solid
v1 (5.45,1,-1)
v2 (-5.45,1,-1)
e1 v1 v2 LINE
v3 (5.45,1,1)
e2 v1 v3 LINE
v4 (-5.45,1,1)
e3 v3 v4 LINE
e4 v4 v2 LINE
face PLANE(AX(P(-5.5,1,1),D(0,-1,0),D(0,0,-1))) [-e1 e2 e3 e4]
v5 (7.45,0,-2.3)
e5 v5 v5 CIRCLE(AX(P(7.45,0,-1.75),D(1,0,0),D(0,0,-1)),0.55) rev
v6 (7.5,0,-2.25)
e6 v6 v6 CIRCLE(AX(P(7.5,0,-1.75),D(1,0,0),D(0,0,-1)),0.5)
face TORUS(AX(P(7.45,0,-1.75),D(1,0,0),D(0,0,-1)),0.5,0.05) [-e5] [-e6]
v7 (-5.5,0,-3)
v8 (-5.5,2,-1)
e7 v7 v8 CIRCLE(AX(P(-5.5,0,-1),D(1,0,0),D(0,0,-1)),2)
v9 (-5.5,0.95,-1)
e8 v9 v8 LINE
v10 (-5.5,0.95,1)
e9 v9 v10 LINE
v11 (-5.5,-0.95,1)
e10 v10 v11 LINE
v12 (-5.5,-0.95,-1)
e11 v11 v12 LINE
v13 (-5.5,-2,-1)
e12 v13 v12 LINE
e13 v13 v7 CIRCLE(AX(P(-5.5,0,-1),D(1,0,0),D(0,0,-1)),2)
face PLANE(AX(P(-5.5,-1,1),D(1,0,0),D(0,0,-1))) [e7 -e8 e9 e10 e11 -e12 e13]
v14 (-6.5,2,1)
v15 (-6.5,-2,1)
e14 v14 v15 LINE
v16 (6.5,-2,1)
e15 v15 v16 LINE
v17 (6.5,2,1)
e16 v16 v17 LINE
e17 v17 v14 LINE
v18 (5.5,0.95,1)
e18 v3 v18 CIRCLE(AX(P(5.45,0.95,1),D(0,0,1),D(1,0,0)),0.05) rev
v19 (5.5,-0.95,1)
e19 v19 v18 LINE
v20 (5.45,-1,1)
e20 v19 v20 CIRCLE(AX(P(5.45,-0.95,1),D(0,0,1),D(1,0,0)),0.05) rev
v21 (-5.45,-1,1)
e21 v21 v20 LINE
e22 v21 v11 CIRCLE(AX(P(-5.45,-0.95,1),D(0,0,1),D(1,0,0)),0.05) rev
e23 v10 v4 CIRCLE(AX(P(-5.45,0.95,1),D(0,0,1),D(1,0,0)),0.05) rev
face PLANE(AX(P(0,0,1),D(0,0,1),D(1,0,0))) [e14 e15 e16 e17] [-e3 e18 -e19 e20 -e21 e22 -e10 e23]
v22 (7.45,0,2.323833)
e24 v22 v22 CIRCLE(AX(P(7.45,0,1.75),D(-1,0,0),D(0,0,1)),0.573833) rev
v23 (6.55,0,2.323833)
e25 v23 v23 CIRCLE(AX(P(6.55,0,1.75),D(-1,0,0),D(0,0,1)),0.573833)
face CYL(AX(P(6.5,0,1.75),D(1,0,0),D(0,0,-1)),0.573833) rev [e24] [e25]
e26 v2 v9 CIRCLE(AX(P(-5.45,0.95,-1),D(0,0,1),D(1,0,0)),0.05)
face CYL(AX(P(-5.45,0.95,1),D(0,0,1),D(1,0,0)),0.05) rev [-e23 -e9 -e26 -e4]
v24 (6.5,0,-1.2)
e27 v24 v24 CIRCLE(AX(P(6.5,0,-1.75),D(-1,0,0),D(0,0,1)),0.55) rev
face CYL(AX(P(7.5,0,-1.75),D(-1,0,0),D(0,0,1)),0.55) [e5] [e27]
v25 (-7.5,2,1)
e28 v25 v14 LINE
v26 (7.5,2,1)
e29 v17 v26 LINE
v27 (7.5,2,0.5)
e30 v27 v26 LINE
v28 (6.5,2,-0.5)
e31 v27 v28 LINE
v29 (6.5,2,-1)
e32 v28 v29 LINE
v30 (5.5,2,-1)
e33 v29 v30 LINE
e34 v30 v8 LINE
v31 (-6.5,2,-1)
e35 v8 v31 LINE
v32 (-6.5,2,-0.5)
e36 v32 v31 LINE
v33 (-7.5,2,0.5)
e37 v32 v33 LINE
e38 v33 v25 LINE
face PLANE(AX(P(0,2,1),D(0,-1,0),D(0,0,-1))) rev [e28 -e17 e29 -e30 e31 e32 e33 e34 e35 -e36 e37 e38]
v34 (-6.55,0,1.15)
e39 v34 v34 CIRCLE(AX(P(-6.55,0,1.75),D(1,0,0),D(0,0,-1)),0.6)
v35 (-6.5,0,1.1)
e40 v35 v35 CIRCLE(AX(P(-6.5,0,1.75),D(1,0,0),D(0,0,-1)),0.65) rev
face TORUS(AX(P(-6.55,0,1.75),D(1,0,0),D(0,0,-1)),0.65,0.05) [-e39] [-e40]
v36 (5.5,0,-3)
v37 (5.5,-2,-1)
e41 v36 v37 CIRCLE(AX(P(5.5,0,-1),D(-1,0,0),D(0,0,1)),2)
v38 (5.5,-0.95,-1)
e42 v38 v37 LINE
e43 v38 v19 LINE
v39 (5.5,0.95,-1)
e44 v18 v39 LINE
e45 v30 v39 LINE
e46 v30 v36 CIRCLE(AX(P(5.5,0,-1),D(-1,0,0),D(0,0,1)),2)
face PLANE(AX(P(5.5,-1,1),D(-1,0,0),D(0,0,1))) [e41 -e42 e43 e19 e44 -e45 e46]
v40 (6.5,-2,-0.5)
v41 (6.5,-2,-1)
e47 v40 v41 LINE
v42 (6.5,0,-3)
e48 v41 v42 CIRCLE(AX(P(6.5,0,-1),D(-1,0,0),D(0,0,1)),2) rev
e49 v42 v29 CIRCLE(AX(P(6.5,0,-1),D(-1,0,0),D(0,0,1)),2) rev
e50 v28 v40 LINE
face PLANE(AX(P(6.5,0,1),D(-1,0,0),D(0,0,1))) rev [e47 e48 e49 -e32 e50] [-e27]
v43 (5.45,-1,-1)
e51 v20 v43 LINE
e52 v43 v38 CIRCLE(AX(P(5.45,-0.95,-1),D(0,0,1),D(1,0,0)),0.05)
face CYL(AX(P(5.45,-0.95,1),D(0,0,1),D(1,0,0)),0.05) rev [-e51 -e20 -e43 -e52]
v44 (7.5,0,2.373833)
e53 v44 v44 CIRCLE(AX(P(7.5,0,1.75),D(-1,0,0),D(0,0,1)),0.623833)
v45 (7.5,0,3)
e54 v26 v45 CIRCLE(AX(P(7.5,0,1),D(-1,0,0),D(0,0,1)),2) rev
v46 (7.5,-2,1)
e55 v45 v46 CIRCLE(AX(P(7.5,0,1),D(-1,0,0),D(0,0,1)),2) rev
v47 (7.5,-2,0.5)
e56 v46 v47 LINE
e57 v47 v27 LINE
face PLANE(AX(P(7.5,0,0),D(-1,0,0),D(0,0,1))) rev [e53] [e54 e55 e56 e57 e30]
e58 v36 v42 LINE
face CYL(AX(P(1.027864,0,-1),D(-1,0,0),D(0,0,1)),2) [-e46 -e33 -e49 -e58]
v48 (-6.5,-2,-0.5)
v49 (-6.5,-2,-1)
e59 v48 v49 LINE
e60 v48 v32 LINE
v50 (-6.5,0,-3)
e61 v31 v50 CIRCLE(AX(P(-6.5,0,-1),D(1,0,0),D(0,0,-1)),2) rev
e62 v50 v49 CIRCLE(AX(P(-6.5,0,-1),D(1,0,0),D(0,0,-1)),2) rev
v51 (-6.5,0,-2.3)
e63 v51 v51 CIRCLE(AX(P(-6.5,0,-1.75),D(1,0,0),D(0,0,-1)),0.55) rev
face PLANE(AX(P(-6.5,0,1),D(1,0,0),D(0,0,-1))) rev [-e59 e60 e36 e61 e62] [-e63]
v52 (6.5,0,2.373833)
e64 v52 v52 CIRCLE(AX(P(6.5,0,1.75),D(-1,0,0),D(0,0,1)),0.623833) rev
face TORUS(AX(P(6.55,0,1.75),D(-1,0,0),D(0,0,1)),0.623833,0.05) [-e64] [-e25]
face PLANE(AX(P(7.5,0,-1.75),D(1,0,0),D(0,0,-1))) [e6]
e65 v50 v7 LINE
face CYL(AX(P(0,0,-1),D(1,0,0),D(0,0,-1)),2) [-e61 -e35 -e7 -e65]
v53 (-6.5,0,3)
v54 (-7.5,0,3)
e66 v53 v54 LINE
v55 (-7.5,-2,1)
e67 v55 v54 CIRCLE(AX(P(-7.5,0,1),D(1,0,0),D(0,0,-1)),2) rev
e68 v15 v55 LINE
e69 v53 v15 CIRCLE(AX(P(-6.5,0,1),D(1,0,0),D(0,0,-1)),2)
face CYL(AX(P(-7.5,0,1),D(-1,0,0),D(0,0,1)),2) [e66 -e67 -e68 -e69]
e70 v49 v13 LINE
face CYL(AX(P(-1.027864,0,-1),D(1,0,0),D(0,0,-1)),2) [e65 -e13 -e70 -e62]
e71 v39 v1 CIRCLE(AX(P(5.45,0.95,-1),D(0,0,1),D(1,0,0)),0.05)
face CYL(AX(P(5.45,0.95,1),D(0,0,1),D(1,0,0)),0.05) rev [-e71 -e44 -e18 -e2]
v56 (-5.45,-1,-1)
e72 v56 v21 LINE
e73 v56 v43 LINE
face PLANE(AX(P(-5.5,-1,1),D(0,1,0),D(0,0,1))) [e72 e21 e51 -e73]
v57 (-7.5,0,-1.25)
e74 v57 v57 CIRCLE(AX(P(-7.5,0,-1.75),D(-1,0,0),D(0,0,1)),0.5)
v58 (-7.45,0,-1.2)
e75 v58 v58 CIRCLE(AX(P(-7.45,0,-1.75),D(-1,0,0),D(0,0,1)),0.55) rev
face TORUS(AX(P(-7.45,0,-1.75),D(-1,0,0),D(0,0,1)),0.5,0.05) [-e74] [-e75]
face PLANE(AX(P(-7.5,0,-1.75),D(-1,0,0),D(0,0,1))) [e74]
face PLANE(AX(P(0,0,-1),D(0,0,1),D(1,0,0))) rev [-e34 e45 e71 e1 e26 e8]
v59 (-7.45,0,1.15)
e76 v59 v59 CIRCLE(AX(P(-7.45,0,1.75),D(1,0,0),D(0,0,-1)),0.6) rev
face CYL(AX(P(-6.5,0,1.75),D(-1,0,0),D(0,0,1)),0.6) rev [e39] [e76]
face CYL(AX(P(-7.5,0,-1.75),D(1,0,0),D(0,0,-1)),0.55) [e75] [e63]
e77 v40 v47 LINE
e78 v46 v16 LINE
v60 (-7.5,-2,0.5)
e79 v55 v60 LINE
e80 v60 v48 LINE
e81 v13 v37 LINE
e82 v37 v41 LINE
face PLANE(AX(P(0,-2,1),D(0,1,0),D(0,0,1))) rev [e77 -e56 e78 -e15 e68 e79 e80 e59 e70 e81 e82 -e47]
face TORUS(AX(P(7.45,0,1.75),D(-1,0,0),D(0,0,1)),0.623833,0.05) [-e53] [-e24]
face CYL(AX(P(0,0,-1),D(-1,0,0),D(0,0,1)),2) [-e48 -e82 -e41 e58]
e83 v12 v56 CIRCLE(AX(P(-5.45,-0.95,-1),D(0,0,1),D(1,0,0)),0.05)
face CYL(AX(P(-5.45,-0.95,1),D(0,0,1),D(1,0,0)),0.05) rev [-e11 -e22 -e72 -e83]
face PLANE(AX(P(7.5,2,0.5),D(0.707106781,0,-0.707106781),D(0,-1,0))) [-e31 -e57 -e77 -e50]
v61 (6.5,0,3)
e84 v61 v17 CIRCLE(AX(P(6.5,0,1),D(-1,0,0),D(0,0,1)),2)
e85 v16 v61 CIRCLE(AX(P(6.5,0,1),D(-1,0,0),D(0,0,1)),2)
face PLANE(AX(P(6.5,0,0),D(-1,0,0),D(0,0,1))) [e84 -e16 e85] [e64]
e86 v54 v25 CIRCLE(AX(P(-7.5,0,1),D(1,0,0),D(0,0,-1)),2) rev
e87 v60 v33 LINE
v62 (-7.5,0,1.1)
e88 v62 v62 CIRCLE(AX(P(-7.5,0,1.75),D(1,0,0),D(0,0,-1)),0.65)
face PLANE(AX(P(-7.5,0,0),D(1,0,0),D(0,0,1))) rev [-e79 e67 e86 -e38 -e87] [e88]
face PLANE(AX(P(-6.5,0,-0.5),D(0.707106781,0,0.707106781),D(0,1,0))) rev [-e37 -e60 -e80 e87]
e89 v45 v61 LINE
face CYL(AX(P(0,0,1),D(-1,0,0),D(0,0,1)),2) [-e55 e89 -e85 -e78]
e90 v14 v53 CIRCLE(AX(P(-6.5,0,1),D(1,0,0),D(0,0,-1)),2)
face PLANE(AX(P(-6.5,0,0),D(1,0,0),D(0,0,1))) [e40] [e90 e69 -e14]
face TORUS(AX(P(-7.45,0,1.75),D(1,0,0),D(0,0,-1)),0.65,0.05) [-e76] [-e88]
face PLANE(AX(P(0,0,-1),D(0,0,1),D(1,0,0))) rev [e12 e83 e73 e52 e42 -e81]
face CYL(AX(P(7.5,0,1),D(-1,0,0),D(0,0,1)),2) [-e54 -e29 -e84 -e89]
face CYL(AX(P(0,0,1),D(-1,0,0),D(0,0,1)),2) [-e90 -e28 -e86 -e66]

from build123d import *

# Parameters (mm, degrees)
SKETCH1_W           = 13
SKETCH1_H           = 4
SKETCH1_W_2         = 11
SKETCH1_H_2         = 2
EXTRUDE_THIN2_DEPTH = 1
SKETCH3_W           = 2.5
SKETCH3_H           = 4
BOSS_EXTRUDE1_DEPTH = 1
FILLET1_R           = 2
CHAMFER1_SIZE       = 1
SKETCH5_W           = 2
SKETCH5_H           = 4
BOSS_EXTRUDE2_DEPTH = 1
FILLET2_R           = 2
FILLET3_R           = 2
CHAMFER2_SIZE       = 1
SKETCH6_W           = 2
SKETCH6_H           = 4
BOSS_EXTRUDE4_DEPTH = 1
FILLET5_R           = 2
SKETCH7_R           = 0.573833464
CUT_EXTRUDE1_DEPTH  = 1
SKETCH8_R           = 0.55
BOSS_EXTRUDE5_DEPTH = 1
FILLET7_R           = 0.05
FILLET8_R           = 0.05
FILLET9_R           = 0.05
FILLET10_R          = 0.05
SKETCH9_R           = 0.6
CUT_EXTRUDE2_DEPTH  = 1
FILLET11_R          = 0.05
BOSS_EXTRUDE6_START = 1
SKETCH10_R          = 0.55
BOSS_EXTRUDE6_DEPTH = 1
FILLET12_R          = 0.05


with BuildPart() as part:
    # Sketch1 → Extrude-Thin2 (new, symmetric)
    with BuildSketch(Plane.XY):
        Rectangle(SKETCH1_W, SKETCH1_H)
        Rectangle(SKETCH1_W_2, SKETCH1_H_2, mode=Mode.SUBTRACT)
    extrude(amount=EXTRUDE_THIN2_DEPTH, both=True)

    # Sketch3 → Boss-Extrude1 (add)
    with BuildSketch(Plane(origin=(6.5, 0, 0), x_dir=(0, 0, -1), z_dir=(1, 0, 0))):
        with Locations((-1.75, 0)):
            Rectangle(SKETCH3_W, SKETCH3_H)
    boss_extrude1 = extrude(amount=BOSS_EXTRUDE1_DEPTH)

    # Fillet1
    fillet1_edges = [part.edges().sort_by_distance(p)[0] for p in [
        (7, -2, 3),
        (7, 2, 3),
    ]]
    fillet(fillet1_edges, radius=FILLET1_R - 0.0001)  # a hair under: the kernel refuses the full size

    # Chamfer1
    chamfer1_edges = [part.edges().sort_by_distance(p)[0] for p in [
        (6.5, 0, 0.5),
    ]]
    chamfer(chamfer1_edges, length=CHAMFER1_SIZE - 0.0001)  # a hair under: the kernel refuses the full size

    # Mirror2: Boss-Extrude1 across plane
    add(boss_extrude1.mirror(Plane(origin=(0, 0, 0), x_dir=(0, 0, 1), z_dir=(1, 0, 0))))

    # Sketch5 → Boss-Extrude2 (add)
    with BuildSketch(Plane(origin=(6.5, 0, 0), x_dir=(0, 0, -1), z_dir=(1, 0, 0))):
        with Locations((2, 0)):
            Rectangle(SKETCH5_W, SKETCH5_H)
    extrude(amount=-BOSS_EXTRUDE2_DEPTH)

    # Fillet2
    fillet2_edges = [part.edges().sort_by_distance(p)[0] for p in [
        (6, -2, -3),
        (6, 2, -3),
    ]]
    fillet(fillet2_edges, radius=FILLET2_R - 0.0001)  # a hair under: the kernel refuses the full size

    # Fillet3
    fillet3_edges = [part.edges().sort_by_distance(p)[0] for p in [
        (-7, 2, 3),
        (-7, -2, 3),
    ]]
    fillet(fillet3_edges, radius=FILLET3_R - 0.0001)  # a hair under: the kernel refuses the full size

    # Chamfer2
    chamfer2_edges = [part.edges().sort_by_distance(p)[0] for p in [
        (-6.5, 0, 0.5),
    ]]
    chamfer(chamfer2_edges, length=CHAMFER2_SIZE - 0.0001)  # a hair under: the kernel refuses the full size

    # Sketch6 → Boss-Extrude4 (add)
    with BuildSketch(Plane.ZY.offset(6.5)):
        with Locations((-2, 0)):
            Rectangle(SKETCH6_W, SKETCH6_H)
    extrude(amount=-BOSS_EXTRUDE4_DEPTH)

    # Fillet5
    fillet5_edges = [part.edges().sort_by_distance(p)[0] for p in [
        (-6, -2, -3),
        (-6, 2, -3),
    ]]
    fillet(fillet5_edges, radius=FILLET5_R - 0.0001)  # a hair under: the kernel refuses the full size

    # Sketch7 → Cut-Extrude1 (cut)
    with BuildSketch(Plane(origin=(7.5, 0, 0), x_dir=(0, 0, -1), z_dir=(1, 0, 0))):
        with Locations((-1.75, 0)):
            Circle(SKETCH7_R)
    extrude(amount=-CUT_EXTRUDE1_DEPTH, mode=Mode.SUBTRACT)

    # Sketch8 → Boss-Extrude5 (add)
    with BuildSketch(Plane(origin=(6.5, 0, 0), x_dir=(0, 0, -1), z_dir=(1, 0, 0))):
        with Locations(Location((1.75, 0, 0), (0, 0, 180))):
            Circle(SKETCH8_R)
    extrude(amount=BOSS_EXTRUDE5_DEPTH)

    # Fillet7
    fillet7_edges = [part.edges().sort_by_distance(p)[0] for p in [
        (7.5, 0, -2.3),
    ]]
    fillet(fillet7_edges, radius=FILLET7_R)

    # Fillet8
    fillet8_edges = [part.edges().sort_by_distance(p)[0] for p in [
        (5.5, -1, 0),
        (5.5, 1, 0),
    ]]
    fillet(fillet8_edges, radius=FILLET8_R)

    # Fillet9
    fillet9_edges = [part.edges().sort_by_distance(p)[0] for p in [
        (-5.5, 1, 0),
        (-5.5, -1, 0),
    ]]
    fillet(fillet9_edges, radius=FILLET9_R)

    # Fillet10
    fillet10_edges = [part.edges().sort_by_distance(p)[0] for p in [
        (6.5, 0, 2.323833464),
        (7.5, 0, 2.323833464),
    ]]
    fillet(fillet10_edges, radius=FILLET10_R)

    # Sketch9 → Cut-Extrude2 (cut)
    with BuildSketch(Plane.ZY.offset(7.5)):
        with Locations((1.75, 0)):
            Circle(SKETCH9_R)
    extrude(amount=-CUT_EXTRUDE2_DEPTH, mode=Mode.SUBTRACT)

    # Fillet11
    fillet11_edges = [part.edges().sort_by_distance(p)[0] for p in [
        (-6.5, 0, 1.15),
        (-7.5, 0, 1.15),
    ]]
    fillet(fillet11_edges, radius=FILLET11_R)

    # Sketch10 → Boss-Extrude6 (add)
    with BuildSketch(Plane.ZY.offset(6.5).offset(BOSS_EXTRUDE6_START)):
        with Locations((-1.75, 0)):
            Circle(SKETCH10_R)
    extrude(amount=-BOSS_EXTRUDE6_DEPTH)

    # Fillet12
    fillet12_edges = [part.edges().sort_by_distance(p)[0] for p in [
        (-7.5, 0, -2.3),
    ]]
    fillet(fillet12_edges, radius=FILLET12_R)


solid = part.part
